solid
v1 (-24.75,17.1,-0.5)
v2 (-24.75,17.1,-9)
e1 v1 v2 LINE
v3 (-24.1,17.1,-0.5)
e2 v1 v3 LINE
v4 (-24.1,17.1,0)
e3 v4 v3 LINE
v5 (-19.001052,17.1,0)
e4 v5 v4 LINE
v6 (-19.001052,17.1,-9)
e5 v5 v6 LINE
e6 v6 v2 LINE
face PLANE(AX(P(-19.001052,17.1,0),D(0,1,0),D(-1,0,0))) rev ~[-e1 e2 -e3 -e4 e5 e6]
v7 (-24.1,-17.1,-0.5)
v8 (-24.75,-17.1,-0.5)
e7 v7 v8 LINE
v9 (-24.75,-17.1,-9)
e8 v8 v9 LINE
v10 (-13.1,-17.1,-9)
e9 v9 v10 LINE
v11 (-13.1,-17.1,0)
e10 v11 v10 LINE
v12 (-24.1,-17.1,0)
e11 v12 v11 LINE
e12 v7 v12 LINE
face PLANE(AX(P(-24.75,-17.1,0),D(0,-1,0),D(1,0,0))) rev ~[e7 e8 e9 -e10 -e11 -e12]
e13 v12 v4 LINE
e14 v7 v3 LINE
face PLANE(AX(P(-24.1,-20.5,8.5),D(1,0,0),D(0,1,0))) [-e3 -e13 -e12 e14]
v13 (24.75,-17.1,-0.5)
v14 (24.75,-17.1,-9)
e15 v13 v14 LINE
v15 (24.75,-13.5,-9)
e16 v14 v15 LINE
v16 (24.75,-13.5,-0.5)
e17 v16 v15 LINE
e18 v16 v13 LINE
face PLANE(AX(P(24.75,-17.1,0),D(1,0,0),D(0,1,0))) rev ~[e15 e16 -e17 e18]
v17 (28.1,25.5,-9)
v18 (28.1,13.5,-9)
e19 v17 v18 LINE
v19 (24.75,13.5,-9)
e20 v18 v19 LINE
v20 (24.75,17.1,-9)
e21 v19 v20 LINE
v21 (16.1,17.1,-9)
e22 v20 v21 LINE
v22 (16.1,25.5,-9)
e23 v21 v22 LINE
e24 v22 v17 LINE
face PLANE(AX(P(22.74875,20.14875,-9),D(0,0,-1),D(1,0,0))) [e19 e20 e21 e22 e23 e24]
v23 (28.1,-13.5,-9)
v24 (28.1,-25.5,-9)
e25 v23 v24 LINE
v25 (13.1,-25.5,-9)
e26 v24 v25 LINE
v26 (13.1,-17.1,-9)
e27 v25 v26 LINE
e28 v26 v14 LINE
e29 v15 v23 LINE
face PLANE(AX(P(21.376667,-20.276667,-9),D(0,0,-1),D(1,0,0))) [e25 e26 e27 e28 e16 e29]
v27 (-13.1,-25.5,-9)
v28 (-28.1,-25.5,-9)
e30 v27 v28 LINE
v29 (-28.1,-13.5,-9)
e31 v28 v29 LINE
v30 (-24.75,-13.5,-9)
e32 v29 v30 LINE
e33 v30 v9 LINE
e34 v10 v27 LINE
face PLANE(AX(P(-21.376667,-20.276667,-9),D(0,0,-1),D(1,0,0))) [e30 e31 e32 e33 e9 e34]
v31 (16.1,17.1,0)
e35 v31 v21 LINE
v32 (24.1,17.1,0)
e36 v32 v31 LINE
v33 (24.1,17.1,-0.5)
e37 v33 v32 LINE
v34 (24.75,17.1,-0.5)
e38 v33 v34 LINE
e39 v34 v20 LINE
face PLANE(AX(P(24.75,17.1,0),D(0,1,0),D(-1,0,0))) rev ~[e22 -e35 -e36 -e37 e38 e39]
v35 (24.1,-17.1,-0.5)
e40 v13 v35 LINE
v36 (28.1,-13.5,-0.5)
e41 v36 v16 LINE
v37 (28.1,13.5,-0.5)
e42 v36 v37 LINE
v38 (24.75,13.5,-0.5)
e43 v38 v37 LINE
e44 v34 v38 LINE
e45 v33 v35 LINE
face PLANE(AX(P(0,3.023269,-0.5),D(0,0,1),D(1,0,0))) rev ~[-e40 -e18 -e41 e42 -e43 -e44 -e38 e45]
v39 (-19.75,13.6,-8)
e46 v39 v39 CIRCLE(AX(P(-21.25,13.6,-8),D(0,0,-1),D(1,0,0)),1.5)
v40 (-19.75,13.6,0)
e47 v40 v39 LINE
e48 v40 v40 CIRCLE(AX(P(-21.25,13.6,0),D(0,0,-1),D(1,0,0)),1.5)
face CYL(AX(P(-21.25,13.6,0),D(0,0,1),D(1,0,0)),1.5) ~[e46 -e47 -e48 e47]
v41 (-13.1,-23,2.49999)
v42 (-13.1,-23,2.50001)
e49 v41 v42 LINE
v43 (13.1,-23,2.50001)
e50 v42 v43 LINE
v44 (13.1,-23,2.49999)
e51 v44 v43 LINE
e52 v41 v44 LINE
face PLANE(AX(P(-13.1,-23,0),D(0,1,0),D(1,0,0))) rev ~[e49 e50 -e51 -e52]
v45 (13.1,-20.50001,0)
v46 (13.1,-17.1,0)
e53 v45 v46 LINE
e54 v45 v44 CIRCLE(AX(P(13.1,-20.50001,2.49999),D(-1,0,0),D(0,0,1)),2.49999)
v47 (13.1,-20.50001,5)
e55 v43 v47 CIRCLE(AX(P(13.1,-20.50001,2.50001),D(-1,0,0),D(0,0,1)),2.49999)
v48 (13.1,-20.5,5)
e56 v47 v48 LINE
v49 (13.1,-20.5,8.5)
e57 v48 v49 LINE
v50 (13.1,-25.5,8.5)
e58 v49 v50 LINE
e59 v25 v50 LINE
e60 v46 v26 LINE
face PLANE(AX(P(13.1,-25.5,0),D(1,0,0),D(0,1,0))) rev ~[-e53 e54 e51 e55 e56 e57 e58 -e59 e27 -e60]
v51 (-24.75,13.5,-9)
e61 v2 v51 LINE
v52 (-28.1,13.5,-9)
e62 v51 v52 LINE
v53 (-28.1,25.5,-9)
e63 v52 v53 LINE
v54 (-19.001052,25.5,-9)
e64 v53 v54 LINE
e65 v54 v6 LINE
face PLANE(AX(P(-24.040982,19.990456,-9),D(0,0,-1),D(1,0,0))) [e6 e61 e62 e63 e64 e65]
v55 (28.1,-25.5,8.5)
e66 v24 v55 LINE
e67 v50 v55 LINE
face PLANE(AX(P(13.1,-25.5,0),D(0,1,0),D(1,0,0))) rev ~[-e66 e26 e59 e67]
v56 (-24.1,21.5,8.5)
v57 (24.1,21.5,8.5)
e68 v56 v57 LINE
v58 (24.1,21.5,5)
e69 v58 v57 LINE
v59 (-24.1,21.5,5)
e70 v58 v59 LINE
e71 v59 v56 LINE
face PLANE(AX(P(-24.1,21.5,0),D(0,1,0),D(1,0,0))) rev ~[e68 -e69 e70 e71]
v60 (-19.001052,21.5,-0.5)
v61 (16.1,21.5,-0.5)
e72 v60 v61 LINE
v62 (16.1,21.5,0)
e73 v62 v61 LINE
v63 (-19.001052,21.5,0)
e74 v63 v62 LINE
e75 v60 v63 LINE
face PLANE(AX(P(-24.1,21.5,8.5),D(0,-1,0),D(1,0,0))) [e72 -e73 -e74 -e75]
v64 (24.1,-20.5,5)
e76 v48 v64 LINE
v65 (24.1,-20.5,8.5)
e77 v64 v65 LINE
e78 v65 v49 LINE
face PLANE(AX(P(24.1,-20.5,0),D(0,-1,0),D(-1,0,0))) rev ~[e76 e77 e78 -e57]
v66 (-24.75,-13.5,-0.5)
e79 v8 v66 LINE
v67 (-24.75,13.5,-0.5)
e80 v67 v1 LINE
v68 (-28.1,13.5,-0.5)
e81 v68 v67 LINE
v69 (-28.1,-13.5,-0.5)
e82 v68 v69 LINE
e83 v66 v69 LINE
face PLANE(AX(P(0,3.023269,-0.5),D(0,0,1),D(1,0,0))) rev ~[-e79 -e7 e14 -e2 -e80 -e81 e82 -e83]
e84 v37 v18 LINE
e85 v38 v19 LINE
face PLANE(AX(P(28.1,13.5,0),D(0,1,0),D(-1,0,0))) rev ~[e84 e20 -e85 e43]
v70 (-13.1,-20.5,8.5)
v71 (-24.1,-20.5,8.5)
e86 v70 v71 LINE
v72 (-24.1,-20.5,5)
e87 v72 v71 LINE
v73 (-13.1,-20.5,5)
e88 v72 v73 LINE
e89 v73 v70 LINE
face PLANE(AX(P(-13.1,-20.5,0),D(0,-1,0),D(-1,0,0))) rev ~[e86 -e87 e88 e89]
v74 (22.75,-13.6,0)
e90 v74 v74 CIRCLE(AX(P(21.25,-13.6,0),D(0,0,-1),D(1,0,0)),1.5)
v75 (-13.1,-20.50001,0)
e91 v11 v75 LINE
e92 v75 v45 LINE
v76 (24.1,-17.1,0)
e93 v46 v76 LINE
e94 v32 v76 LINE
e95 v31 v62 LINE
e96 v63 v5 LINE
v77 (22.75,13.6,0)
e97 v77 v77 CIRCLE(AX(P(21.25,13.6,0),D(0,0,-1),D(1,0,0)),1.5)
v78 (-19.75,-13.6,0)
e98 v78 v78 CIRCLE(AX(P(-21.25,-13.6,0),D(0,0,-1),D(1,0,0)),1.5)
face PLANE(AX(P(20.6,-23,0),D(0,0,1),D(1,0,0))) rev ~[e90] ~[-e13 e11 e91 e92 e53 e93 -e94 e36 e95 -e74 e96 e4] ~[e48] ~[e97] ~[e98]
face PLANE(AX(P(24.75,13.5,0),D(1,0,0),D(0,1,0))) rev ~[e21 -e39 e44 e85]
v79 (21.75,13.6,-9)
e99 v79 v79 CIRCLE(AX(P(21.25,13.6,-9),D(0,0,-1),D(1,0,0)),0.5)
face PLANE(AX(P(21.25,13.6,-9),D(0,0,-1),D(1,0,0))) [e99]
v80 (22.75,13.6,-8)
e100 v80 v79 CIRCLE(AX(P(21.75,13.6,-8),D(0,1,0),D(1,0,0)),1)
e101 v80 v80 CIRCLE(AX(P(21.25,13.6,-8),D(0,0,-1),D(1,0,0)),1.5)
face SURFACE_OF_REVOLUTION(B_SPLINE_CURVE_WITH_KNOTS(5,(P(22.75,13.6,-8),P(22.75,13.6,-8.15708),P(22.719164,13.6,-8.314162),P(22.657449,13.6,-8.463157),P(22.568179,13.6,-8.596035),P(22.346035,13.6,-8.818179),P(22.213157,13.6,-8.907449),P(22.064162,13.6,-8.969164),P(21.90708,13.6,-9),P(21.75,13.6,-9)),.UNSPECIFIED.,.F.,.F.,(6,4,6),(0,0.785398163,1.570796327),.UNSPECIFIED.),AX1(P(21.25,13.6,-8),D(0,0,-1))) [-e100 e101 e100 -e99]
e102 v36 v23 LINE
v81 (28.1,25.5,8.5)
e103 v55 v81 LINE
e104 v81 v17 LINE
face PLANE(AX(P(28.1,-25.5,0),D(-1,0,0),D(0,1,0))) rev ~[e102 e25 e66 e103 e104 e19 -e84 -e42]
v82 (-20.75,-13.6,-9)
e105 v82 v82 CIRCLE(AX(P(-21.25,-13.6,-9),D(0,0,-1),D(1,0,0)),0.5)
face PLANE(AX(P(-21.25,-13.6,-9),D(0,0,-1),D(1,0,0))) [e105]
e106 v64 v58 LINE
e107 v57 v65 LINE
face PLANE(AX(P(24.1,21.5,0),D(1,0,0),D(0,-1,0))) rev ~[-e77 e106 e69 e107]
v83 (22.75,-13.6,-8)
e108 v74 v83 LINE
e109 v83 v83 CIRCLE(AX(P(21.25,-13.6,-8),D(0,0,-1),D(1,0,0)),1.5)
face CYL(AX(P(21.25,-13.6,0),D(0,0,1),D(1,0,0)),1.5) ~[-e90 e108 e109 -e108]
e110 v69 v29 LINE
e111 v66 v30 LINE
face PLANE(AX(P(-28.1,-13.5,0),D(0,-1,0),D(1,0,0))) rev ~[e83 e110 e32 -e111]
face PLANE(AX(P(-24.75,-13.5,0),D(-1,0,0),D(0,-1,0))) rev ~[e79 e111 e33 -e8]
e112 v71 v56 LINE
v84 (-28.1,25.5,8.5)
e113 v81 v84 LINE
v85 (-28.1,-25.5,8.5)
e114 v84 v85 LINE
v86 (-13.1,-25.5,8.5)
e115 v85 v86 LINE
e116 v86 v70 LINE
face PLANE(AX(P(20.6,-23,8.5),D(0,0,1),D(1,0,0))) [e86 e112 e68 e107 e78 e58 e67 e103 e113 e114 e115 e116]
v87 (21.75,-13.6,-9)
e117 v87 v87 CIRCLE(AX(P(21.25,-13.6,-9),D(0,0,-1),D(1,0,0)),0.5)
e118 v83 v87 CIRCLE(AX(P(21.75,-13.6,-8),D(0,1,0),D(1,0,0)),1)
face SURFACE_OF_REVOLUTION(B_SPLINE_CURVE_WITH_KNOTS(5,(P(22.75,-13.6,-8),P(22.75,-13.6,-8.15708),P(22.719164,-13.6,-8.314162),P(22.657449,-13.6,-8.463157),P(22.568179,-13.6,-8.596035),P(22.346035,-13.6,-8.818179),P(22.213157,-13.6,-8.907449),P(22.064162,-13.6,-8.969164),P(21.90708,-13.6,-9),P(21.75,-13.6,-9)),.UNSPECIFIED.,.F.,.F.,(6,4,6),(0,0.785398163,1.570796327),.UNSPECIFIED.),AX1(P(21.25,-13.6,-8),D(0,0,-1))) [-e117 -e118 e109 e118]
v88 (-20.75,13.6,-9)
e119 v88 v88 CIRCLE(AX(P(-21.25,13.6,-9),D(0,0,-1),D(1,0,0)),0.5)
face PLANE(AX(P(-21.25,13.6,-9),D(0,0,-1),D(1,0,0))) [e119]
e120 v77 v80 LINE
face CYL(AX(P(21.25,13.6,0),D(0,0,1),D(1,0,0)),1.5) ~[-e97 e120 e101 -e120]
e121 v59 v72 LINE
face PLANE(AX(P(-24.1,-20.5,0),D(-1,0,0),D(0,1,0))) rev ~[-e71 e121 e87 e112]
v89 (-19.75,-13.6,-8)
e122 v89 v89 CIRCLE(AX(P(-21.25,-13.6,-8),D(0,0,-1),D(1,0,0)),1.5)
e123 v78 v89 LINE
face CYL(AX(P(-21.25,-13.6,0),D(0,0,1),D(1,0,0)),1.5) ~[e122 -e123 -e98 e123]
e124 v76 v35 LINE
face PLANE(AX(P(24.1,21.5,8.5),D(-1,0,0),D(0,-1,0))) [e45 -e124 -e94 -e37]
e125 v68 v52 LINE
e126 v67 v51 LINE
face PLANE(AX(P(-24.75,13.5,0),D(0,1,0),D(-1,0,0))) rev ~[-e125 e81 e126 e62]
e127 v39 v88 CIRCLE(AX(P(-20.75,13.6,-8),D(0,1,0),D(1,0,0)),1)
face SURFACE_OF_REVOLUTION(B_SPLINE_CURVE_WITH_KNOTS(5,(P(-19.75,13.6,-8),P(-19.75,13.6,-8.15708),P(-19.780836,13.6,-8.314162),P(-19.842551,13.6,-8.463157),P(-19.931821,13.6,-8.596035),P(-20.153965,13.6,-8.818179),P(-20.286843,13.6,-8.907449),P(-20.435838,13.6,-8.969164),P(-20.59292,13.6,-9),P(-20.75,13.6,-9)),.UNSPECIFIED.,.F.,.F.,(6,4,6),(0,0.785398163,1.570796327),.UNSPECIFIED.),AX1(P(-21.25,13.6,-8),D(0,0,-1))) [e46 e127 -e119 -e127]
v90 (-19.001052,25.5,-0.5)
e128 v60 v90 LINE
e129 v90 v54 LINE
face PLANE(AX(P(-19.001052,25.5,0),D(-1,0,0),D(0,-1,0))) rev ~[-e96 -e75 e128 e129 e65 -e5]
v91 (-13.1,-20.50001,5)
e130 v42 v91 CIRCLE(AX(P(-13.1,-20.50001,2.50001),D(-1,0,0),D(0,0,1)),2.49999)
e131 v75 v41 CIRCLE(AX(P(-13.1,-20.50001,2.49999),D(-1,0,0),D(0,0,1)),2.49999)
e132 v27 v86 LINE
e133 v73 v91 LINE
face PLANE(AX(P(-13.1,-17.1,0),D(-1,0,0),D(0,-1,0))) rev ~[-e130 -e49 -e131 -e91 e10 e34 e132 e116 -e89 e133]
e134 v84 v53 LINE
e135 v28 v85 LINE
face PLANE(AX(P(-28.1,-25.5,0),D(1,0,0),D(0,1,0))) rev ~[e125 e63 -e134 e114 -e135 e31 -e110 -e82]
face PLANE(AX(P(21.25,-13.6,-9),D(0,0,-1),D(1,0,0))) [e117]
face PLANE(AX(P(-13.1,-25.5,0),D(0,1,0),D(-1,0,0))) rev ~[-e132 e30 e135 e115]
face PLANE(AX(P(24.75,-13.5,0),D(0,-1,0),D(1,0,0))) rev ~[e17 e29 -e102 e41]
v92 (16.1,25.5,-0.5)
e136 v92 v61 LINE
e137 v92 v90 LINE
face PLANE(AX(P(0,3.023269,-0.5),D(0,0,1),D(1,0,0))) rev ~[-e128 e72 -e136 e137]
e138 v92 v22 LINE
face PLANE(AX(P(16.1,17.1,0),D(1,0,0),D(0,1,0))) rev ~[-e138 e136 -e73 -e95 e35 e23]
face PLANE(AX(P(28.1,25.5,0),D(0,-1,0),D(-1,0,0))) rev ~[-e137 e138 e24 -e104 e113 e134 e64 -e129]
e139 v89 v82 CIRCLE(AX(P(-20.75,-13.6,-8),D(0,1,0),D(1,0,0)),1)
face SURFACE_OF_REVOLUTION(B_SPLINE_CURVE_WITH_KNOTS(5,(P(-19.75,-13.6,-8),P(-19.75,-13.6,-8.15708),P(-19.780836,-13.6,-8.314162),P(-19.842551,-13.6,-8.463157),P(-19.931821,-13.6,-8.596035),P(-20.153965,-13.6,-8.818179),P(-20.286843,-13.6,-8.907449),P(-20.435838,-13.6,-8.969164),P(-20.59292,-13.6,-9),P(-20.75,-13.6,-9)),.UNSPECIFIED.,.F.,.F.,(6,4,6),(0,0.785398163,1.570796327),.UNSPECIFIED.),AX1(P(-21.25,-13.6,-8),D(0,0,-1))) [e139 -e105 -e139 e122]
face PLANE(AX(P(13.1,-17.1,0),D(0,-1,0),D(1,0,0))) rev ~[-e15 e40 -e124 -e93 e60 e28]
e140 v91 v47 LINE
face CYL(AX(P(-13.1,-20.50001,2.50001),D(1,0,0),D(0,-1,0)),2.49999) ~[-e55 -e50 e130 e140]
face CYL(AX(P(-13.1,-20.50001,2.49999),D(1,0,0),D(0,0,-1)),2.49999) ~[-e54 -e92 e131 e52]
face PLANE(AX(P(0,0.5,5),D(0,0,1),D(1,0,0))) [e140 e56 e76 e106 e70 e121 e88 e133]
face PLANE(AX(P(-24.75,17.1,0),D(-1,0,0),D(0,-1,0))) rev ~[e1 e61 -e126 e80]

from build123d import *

# Parameters (mm, degrees)
F0_W     = 26.2
F0_H     = 2.5
F1_DEPTH = 5
F2_DEPTH = 8.5
F4_DEPTH = 9
F3_R     = 1.5
F5_DEPTH = 9
F6_R     = 1
F7_R     = 2.49999


# Not quite as in the source:
# - a fillet or chamfer is up to 0.001 mm smaller than in the source, because OpenCascade refuses the exact size


with BuildPart() as f1:
    # F0 (on Top) → F1 (new body)
    with BuildSketch(Plane.XY):
        Polygon((13.1, -20.5), (23.1, -20.5), (24.1, -20.5), (24.1, 21.5), (-24.1, 21.5), (-24.1, -20.5), (-23.1, -20.5), (-13.1, -20.5), align=None)
        with Locations((0, -21.75)):
            Rectangle(F0_W, F0_H)
        Polygon((-13.1, -23), (-13.1, -20.5), (-23.1, -20.5), (-24.1, -20.5), (-28.1, -20.5), (-28.1, -25.5), (-13.1, -25.5), align=None)
    extrude(amount=F1_DEPTH)

    # F0 (on Top) → F2 (join)
    with BuildSketch(Plane.XY):
        Polygon((24.1, -20.5), (23.1, -20.5), (13.1, -20.5), (13.1, -23), (13.1, -25.5), (28.1, -25.5), (28.1, -20.5), align=None)
        Polygon((24.1, 21.5), (24.1, -20.5), (28.1, -20.5), (28.1, 25.5), (-28.1, 25.5), (-28.1, -20.5), (-24.1, -20.5), (-24.1, 21.5), align=None)
        Polygon((-13.1, -23), (-13.1, -20.5), (-23.1, -20.5), (-24.1, -20.5), (-28.1, -20.5), (-28.1, -25.5), (-13.1, -25.5), align=None)
    extrude(amount=F2_DEPTH)

    # F3 (on face) → F4 (join)
    with BuildSketch(Plane(origin=(0, 0, 0), x_dir=(1, 0, 0), z_dir=(0, 0, -1))):
        Polygon((-28.1, 13.5), (-24.75, 13.5), (-24.75, 17.1), (-13.1, 17.1), (-13.1, 23), (-13.1, 25.5), (-28.1, 25.5), align=None)
        Polygon((-19.0010517836, -25.5), (-19.0010517836, -17.1), (-24.75, -17.1), (-24.75, -13.5), (-28.1, -13.5), (-28.1, -25.5), align=None)
        Polygon((24.75, -13.5), (24.75, -17.1), (16.1, -17.1), (16.1, -25.5), (28.1, -25.5), (28.1, -13.5), align=None)
        Polygon((24.75, 17.1), (24.75, 13.5), (28.1, 13.5), (28.1, 25.5), (13.1, 25.5), (13.1, 23), (13.1, 17.1), align=None)
    extrude(amount=F4_DEPTH)

    # F3 (on face) + F2_face1 (on face) → F5 (join)
    with BuildSketch(Plane(origin=(0, 0, 0), x_dir=(1, 0, 0), z_dir=(0, 0, -1))):
        with Locations((-21.25, 13.6)):
            Circle(F3_R)
        with Locations((-21.25, -13.6)):
            Circle(F3_R)
        with Locations((21.25, -13.6)):
            Circle(F3_R)
        with Locations((21.25, 13.6)):
            Circle(F3_R)
    with BuildSketch(Plane(origin=(0, 2.8148564997, 8.5), x_dir=(1, 0, 0), z_dir=(0, 0, 1))):
        Polygon((24.1, -23.3148564997), (13.1, -23.3148564997), (13.1, -28.3148564997), (28.1, -28.3148564997), (28.1, 22.6851435003), (-28.1, 22.6851435003), (-28.1, -28.3148564997), (-13.1, -28.3148564997), (-13.1, -23.3148564997), (-24.1, -23.3148564997), (-24.1, 18.6851435003), (24.1, 18.6851435003), align=None)
    extrude(amount=F5_DEPTH, dir=(0, 0, -1))

    # F6
    f6_edges = [f1.edges().sort_by_distance(p)[0] for p in [
        (-22.75, 13.6, -9),
        (-22.75, -13.6, -9),
        (19.75, -13.6, -9),
        (19.75, 13.6, -9),
    ]]
    fillet(f6_edges, radius=F6_R)

    # F7 (radius 2.5 in the source; OpenCascade refuses exactly that, so slightly less here)
    f7_edges = [f1.edges().sort_by_distance(p)[0] for p in [
        (0, -23, 0),
        (0, -23, 5),
    ]]
    fillet(f7_edges, radius=F7_R)


solid = f1.part
